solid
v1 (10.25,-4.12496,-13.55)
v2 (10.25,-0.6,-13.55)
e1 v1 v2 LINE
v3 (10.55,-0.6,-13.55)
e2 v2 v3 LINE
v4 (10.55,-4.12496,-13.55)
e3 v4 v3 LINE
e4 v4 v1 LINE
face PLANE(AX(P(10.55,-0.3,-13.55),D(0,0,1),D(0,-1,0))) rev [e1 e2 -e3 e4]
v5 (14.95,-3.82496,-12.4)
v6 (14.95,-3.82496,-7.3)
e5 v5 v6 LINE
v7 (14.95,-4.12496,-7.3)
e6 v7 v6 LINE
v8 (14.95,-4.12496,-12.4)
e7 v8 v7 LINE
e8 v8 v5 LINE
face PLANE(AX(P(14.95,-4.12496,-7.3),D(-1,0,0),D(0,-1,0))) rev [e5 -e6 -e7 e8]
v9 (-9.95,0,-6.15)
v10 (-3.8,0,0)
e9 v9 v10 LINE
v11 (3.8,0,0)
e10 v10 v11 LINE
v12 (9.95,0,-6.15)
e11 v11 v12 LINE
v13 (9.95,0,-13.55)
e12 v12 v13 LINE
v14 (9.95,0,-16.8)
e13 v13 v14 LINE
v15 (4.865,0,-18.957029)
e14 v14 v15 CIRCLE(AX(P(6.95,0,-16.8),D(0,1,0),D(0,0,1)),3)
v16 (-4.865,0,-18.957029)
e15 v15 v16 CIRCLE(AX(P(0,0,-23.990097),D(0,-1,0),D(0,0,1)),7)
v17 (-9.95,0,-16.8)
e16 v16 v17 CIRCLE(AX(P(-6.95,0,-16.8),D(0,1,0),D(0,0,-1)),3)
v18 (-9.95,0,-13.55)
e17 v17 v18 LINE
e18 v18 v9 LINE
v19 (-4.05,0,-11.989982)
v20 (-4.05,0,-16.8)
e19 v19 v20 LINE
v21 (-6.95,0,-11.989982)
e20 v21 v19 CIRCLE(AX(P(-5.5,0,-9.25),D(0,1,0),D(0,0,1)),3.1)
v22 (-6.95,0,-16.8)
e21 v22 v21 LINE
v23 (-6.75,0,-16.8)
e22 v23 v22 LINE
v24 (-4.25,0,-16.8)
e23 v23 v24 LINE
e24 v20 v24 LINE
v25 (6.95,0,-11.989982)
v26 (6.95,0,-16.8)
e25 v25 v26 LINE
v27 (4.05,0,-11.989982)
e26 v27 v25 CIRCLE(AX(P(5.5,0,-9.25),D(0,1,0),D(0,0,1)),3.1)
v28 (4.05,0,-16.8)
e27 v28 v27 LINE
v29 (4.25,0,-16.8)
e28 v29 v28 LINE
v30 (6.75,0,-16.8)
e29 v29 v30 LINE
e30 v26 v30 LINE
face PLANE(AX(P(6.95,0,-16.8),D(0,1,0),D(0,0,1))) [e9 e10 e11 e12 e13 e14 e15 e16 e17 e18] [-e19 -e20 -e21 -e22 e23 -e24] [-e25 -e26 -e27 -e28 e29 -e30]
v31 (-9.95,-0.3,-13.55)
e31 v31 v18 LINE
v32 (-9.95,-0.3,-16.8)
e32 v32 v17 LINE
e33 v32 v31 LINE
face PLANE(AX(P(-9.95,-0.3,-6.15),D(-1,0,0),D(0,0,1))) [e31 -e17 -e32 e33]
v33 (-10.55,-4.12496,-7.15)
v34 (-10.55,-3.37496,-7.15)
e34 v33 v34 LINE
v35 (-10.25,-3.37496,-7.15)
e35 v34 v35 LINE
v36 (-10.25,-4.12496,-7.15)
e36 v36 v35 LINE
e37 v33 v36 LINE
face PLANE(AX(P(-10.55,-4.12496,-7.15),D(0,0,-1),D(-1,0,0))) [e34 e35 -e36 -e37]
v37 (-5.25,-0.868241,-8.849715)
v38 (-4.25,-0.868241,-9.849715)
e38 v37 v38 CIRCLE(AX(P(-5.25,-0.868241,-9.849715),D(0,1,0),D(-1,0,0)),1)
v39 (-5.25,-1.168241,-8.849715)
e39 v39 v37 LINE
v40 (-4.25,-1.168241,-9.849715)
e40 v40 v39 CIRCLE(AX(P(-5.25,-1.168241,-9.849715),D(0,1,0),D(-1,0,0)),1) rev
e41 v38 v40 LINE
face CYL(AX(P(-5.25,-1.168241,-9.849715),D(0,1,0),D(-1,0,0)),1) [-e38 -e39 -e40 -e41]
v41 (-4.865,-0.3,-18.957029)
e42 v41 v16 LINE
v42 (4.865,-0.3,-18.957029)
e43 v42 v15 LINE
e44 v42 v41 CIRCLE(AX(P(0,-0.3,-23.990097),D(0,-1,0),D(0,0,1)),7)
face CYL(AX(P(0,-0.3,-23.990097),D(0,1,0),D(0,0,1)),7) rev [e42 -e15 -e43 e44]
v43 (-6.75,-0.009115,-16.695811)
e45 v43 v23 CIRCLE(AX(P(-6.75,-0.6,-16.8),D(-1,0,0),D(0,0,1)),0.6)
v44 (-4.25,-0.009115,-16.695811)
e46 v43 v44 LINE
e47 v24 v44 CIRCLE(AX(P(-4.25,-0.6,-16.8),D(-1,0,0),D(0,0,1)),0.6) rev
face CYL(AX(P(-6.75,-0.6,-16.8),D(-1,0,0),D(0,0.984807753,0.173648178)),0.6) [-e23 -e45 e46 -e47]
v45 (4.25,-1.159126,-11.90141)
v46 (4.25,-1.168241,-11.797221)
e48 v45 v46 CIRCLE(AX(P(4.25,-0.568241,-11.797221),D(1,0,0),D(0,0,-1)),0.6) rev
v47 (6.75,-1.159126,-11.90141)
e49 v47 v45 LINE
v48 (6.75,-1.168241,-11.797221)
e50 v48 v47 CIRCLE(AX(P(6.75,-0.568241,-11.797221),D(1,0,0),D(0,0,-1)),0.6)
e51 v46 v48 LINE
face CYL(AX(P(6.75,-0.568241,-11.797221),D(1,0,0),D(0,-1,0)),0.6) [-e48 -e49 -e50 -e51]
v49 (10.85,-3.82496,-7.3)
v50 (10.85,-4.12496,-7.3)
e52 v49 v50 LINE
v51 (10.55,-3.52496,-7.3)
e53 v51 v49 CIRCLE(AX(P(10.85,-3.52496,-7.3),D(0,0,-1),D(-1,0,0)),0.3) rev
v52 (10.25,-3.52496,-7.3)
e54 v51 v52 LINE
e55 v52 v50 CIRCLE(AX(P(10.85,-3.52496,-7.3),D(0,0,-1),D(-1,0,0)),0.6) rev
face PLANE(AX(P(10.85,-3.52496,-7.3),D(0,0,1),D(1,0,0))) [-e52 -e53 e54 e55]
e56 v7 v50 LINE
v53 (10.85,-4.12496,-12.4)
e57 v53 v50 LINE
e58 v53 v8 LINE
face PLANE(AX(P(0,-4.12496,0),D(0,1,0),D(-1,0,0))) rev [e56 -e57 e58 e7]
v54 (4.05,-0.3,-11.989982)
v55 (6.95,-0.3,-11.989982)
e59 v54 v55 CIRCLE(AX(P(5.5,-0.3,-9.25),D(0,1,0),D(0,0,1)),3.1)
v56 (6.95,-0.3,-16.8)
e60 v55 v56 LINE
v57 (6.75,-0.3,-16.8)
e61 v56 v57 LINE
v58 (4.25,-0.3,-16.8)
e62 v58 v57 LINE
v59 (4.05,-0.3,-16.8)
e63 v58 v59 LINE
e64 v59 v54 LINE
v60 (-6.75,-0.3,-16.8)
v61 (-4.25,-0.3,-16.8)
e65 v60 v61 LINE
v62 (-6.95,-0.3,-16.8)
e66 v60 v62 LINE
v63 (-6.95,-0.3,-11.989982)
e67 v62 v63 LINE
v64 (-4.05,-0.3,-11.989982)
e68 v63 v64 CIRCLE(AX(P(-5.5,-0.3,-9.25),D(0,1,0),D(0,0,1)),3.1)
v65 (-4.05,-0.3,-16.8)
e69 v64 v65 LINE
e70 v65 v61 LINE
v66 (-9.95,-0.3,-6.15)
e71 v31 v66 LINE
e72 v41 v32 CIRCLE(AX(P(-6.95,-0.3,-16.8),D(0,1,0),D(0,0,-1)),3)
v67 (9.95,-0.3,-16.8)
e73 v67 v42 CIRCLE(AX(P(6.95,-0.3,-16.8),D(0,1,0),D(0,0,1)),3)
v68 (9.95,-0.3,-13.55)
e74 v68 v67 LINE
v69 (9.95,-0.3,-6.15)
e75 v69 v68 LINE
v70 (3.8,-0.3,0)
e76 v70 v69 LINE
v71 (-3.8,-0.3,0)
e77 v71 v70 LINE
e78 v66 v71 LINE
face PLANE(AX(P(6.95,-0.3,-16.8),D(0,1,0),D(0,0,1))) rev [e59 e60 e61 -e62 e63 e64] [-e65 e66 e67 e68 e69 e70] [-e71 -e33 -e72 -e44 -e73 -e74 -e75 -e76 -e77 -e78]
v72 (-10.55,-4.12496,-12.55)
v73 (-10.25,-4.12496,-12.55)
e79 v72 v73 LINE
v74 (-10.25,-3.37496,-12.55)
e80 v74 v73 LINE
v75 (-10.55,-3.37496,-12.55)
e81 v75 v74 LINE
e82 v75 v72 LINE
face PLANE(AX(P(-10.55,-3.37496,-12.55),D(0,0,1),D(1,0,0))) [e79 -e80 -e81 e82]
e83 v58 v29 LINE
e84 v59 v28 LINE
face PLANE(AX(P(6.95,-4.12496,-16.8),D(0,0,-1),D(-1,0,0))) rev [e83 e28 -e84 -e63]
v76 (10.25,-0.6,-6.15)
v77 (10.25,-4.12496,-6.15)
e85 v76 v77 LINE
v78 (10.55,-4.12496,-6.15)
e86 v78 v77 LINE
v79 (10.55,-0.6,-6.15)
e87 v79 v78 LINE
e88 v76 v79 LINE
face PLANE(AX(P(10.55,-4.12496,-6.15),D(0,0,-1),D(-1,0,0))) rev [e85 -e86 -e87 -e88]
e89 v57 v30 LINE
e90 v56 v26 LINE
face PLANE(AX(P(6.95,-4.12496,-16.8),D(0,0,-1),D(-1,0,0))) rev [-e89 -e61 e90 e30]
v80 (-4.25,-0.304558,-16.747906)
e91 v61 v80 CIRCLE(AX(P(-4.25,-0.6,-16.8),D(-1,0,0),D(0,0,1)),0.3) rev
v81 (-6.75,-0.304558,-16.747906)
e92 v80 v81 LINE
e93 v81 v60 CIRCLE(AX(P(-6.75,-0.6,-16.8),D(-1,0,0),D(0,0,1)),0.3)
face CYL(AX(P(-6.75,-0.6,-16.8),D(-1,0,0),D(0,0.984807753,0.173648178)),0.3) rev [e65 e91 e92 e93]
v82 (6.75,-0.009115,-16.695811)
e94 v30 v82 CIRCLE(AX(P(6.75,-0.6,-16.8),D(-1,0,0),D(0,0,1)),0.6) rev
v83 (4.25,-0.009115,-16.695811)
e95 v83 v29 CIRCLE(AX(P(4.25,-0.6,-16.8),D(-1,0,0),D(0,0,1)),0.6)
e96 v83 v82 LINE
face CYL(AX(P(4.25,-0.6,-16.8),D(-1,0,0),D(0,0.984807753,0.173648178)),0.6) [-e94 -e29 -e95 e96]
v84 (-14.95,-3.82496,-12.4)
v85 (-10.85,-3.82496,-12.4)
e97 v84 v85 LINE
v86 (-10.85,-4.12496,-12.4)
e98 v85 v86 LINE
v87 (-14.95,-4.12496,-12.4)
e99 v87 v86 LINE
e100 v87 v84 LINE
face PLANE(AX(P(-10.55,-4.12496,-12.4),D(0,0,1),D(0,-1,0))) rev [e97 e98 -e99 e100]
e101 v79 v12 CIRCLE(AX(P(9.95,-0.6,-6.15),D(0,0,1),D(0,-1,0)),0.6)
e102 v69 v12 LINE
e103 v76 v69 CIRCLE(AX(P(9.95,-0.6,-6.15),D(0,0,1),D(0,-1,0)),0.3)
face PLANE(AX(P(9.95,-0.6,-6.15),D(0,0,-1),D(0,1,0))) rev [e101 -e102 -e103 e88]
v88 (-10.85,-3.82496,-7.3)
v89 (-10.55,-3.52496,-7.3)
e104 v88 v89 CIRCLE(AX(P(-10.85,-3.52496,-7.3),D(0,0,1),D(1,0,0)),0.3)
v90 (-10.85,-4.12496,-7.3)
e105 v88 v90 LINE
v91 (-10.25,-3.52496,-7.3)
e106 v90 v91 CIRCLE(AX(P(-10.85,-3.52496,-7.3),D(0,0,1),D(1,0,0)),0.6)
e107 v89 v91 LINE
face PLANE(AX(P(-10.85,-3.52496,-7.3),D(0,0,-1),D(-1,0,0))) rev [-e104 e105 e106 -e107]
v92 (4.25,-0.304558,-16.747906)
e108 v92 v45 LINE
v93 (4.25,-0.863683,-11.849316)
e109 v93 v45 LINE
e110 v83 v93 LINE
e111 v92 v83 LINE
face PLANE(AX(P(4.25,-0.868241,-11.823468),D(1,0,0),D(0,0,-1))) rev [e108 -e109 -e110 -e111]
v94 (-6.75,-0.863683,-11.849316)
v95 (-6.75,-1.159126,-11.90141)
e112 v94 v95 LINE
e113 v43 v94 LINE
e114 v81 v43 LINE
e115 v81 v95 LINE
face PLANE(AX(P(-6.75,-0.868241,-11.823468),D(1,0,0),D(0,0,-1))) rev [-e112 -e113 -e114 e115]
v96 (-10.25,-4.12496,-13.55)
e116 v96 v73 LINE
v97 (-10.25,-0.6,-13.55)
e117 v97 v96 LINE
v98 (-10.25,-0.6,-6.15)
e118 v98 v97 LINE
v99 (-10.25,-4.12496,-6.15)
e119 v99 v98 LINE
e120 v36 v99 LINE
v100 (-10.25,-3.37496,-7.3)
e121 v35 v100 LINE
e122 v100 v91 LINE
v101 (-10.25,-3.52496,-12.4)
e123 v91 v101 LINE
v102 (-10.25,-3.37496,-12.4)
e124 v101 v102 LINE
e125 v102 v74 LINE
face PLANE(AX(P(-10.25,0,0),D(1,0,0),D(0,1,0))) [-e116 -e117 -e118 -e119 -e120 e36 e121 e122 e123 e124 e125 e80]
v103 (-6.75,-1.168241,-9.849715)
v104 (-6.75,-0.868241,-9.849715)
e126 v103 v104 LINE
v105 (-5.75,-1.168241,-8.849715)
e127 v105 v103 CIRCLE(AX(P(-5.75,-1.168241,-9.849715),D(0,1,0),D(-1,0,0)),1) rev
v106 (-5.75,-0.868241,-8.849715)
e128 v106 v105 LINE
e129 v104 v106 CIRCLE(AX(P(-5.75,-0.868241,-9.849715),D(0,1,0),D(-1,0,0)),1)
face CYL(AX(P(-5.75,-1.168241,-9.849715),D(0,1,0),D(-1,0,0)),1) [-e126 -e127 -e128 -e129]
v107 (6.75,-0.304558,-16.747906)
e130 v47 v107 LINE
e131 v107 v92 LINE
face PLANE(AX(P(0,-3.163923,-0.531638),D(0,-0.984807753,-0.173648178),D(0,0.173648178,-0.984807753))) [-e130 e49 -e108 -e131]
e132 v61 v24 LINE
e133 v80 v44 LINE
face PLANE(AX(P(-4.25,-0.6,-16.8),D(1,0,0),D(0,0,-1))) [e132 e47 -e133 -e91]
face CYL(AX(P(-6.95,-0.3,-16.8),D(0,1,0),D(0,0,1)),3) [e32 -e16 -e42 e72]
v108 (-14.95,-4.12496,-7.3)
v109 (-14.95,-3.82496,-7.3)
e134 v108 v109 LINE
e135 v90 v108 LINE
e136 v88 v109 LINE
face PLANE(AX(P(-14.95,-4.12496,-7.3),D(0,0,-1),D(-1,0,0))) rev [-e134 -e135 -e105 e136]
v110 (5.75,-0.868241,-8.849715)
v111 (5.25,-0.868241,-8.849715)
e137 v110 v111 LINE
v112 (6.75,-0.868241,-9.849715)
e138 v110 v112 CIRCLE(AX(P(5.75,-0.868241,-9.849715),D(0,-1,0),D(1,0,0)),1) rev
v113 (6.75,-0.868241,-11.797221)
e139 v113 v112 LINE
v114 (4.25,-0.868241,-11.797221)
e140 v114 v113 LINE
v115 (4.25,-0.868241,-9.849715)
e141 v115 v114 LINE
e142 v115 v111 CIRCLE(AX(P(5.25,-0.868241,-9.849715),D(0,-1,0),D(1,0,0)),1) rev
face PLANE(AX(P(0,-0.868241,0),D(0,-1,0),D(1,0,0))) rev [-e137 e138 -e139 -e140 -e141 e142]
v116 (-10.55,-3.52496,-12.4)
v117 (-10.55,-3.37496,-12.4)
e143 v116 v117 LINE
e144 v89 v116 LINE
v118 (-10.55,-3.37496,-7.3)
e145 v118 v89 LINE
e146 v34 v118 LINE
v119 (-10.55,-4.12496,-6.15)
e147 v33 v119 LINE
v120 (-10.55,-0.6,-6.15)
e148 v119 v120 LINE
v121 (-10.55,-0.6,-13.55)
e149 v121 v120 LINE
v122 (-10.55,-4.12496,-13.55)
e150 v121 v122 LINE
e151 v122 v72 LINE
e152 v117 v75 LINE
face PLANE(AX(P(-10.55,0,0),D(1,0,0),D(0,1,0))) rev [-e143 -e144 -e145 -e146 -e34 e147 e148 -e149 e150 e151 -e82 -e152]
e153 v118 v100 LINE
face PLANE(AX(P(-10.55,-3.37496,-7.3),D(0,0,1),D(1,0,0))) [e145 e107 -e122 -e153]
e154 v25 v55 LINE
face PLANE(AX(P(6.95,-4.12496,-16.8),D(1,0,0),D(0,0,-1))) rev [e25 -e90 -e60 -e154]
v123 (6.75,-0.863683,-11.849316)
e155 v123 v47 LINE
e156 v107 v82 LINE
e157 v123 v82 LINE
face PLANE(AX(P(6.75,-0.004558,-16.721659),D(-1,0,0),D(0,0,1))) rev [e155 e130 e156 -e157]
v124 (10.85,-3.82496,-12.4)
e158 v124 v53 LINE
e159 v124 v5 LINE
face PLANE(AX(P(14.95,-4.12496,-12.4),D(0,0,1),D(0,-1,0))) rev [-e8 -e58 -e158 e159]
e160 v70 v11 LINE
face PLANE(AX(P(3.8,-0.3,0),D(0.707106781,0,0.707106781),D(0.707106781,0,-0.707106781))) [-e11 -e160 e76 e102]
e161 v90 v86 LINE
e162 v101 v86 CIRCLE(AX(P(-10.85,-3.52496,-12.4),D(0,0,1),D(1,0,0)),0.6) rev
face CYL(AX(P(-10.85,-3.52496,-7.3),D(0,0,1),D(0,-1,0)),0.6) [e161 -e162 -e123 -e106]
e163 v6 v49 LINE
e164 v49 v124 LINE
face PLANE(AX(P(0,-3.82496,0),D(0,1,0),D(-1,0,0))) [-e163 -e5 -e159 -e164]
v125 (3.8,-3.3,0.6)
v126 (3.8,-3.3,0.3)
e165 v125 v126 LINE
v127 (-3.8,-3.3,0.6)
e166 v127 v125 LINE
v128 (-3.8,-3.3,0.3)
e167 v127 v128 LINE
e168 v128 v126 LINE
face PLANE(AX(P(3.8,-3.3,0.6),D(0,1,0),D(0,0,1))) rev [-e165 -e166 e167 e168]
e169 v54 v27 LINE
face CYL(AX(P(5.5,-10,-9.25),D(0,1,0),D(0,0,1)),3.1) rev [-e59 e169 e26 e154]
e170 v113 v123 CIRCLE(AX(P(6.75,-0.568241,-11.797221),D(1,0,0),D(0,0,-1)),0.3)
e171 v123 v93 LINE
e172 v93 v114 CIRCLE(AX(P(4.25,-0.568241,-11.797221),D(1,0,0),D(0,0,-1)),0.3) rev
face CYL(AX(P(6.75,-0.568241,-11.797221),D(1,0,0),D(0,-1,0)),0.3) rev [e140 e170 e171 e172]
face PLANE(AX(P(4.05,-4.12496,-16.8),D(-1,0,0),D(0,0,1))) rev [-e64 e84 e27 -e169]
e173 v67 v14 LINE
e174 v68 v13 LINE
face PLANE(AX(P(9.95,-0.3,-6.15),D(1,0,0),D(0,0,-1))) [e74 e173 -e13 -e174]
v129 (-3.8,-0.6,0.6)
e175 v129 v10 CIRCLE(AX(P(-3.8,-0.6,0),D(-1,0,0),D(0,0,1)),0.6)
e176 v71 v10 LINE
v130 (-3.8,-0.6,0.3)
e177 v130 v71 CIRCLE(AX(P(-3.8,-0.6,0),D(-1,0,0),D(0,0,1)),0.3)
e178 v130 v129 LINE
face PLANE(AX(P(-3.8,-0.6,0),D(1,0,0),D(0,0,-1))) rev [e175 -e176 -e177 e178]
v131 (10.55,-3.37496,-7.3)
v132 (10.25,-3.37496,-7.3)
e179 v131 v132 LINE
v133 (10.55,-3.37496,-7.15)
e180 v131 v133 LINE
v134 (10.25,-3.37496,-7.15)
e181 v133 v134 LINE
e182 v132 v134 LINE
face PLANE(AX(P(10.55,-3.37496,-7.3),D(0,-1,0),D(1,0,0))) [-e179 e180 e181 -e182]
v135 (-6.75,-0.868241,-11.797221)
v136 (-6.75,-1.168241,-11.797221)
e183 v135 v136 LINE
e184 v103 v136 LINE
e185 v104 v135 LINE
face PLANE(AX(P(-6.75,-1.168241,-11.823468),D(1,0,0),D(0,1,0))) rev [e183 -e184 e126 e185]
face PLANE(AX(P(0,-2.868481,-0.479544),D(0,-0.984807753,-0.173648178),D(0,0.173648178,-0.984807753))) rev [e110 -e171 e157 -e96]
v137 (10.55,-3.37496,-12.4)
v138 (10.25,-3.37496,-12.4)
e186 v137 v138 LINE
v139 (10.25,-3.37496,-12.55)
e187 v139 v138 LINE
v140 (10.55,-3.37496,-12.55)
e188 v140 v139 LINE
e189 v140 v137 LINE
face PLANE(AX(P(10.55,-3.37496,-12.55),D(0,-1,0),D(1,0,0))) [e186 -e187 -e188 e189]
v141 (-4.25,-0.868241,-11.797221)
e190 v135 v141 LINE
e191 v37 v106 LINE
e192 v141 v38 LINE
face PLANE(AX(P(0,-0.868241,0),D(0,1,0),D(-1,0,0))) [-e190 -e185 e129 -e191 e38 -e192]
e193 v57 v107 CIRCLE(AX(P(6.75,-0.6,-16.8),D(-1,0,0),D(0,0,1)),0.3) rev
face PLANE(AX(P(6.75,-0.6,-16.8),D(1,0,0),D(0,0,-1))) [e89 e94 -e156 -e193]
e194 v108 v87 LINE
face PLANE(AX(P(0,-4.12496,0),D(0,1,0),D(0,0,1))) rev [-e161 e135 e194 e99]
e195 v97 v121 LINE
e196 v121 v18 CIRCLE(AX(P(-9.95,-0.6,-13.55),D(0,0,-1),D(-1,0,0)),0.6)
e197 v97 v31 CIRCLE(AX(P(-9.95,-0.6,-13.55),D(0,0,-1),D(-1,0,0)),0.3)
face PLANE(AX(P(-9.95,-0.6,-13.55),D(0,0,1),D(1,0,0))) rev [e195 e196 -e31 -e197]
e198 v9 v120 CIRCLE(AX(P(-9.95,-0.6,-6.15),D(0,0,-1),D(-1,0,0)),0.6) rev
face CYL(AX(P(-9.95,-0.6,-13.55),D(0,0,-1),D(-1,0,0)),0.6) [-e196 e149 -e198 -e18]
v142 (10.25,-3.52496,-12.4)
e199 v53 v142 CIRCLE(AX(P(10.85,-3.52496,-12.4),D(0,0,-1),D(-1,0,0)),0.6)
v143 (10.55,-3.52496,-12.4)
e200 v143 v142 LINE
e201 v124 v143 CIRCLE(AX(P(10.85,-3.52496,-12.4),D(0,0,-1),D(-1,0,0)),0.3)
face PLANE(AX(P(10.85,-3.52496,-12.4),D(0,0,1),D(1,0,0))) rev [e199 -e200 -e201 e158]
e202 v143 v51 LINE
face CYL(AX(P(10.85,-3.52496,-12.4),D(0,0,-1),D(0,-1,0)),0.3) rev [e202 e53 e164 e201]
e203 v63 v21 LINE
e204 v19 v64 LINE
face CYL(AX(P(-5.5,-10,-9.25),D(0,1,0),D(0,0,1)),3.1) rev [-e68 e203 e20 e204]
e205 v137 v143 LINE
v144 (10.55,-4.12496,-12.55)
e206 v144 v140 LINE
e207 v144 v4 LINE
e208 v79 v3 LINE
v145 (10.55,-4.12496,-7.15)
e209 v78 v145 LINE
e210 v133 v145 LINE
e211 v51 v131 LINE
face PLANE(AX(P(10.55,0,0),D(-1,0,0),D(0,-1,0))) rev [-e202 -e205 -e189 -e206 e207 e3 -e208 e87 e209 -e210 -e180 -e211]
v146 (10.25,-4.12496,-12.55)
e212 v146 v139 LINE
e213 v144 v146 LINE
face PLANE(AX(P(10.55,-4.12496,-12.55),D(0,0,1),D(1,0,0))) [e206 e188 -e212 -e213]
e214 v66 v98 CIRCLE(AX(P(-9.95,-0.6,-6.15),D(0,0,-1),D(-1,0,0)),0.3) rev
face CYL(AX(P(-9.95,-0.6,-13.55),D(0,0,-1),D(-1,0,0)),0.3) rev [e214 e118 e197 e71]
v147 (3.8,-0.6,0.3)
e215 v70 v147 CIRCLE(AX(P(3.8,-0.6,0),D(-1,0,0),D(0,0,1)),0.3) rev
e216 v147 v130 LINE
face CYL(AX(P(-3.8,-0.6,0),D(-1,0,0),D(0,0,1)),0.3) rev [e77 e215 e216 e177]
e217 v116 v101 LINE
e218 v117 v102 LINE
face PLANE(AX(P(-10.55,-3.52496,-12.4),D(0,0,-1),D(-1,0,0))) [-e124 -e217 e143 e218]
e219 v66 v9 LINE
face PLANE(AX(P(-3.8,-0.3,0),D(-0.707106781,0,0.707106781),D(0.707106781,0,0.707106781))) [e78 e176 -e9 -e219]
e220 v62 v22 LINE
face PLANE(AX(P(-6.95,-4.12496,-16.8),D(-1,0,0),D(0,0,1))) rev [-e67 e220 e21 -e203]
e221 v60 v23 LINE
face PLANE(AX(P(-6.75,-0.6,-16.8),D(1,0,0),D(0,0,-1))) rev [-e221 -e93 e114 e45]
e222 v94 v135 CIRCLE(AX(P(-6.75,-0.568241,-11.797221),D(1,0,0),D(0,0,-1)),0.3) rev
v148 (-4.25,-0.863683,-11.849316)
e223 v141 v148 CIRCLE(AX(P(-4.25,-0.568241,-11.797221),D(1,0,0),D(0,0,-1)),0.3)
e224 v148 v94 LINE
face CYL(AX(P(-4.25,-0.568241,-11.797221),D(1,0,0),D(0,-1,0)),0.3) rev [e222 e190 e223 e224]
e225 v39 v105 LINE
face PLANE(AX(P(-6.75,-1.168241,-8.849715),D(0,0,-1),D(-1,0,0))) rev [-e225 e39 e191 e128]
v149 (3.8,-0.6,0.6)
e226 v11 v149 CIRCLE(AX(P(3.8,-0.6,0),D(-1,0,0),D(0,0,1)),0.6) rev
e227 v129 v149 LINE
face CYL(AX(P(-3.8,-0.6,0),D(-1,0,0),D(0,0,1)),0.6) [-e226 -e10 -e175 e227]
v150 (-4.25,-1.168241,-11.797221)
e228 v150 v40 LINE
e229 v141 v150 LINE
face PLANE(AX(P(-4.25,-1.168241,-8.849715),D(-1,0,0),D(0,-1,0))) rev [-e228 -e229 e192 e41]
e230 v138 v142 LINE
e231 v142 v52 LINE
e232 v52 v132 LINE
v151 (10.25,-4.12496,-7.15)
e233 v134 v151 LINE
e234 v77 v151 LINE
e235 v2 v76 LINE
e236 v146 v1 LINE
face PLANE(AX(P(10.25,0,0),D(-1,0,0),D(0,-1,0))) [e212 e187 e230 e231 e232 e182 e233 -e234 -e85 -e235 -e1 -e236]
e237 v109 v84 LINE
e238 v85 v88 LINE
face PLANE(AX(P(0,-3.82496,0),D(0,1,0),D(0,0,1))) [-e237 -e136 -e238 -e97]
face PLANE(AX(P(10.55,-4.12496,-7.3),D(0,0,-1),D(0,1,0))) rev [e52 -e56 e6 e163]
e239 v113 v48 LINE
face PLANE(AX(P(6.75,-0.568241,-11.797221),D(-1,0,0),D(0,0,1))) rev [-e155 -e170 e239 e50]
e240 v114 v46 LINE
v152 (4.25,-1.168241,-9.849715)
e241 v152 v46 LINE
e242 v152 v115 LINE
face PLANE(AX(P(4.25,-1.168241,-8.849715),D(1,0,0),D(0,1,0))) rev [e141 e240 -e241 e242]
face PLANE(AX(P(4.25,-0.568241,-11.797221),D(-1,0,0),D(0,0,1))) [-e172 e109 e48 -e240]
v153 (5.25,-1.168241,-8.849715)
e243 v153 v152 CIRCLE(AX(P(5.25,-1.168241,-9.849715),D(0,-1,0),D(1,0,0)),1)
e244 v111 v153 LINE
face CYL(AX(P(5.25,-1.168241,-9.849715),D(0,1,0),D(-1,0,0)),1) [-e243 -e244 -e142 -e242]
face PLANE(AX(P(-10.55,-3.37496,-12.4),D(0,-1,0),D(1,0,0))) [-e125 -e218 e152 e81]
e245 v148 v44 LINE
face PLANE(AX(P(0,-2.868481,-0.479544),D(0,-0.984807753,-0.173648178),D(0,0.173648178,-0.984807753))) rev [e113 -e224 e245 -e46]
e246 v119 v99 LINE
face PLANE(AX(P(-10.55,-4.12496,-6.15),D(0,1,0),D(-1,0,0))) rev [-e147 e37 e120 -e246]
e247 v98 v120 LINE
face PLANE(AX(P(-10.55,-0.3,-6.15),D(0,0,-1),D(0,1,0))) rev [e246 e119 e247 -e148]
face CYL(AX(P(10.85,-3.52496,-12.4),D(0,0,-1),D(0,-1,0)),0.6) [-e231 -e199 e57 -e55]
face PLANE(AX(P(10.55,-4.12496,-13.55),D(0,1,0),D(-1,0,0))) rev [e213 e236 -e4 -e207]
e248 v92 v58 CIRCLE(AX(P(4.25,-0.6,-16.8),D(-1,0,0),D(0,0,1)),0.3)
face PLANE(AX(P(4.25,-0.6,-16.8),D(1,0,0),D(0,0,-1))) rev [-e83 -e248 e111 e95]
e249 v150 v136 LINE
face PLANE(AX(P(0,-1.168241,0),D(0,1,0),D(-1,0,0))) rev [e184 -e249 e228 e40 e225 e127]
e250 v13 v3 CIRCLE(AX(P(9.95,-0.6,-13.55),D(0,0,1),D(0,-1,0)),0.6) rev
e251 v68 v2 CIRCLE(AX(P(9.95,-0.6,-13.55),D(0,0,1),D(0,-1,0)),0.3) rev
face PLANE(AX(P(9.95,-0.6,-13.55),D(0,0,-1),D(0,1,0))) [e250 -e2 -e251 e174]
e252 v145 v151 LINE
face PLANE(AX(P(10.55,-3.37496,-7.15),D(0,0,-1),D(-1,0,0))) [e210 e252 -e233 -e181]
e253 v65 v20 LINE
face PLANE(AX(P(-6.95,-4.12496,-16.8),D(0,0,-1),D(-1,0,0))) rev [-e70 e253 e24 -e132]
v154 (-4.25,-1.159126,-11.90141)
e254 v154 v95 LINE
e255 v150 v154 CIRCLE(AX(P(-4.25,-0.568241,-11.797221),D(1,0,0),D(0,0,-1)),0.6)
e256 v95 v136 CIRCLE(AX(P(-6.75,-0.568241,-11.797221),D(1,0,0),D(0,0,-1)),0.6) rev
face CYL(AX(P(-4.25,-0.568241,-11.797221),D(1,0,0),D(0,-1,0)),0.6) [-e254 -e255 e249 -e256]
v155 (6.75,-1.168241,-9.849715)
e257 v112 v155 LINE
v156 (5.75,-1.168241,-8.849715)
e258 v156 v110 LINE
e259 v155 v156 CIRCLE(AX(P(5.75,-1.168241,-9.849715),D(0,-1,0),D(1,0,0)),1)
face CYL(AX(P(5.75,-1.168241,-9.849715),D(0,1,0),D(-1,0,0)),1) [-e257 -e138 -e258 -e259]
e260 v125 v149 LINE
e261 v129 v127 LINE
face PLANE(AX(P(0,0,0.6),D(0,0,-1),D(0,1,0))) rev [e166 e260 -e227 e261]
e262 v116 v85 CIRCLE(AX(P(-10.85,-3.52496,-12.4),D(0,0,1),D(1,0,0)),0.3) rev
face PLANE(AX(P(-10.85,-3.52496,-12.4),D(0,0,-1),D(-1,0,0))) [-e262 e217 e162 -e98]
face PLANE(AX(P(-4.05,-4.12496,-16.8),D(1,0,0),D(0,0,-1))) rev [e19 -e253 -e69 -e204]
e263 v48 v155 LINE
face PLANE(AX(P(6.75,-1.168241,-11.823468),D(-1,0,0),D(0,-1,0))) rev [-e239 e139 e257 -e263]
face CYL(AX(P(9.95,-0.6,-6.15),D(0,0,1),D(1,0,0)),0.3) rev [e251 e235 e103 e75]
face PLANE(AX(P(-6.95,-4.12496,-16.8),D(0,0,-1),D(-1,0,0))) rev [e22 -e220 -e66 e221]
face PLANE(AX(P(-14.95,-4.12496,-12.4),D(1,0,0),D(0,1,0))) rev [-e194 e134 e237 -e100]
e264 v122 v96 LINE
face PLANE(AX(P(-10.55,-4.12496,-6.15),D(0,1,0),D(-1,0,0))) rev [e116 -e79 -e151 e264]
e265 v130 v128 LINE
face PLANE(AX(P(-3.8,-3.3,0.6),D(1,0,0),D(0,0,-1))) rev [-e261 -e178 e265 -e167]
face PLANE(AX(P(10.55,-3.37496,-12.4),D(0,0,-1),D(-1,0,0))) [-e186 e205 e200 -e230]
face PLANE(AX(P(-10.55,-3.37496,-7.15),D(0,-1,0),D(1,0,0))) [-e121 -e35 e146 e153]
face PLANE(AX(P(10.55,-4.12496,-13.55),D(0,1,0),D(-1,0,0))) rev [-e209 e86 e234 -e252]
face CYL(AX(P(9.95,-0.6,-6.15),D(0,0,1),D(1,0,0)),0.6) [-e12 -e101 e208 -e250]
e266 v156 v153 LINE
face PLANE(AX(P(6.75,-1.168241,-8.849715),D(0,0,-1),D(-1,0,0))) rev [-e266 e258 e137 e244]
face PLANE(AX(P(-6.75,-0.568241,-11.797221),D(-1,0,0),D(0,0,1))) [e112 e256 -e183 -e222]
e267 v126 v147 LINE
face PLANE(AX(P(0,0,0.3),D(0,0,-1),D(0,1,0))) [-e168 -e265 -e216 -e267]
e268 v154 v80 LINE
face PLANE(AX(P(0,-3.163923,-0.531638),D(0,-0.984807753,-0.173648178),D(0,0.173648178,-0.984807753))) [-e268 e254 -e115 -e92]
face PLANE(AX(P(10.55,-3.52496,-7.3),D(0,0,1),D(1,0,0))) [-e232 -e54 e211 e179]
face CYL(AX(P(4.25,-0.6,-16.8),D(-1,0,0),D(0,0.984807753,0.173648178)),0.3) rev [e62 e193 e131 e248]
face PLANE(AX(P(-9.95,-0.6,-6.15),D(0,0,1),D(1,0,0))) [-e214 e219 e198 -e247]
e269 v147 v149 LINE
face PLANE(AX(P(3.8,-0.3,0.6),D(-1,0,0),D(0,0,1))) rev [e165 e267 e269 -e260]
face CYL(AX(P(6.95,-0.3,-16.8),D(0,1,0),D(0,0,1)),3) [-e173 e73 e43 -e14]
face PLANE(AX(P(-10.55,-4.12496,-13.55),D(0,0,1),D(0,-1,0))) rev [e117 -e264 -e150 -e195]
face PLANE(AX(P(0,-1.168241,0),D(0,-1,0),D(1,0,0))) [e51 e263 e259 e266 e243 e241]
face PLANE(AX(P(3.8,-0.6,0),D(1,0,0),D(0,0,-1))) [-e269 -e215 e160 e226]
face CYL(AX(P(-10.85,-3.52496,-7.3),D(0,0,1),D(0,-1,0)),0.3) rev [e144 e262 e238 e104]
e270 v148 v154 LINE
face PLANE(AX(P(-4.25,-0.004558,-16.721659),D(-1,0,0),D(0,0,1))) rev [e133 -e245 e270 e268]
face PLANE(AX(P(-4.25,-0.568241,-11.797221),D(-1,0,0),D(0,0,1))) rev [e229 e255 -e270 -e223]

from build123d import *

# Parameters (mm, degrees)
BASE_FLANGE1_DEPTH              = 0.3
EDGE_FLANGE2_DEPTH              = 7.6
EDGE_FLANGE3_DEPTH              = 7.4
EDGE_FLANGE3_BEND_DEPTH         = 7.4
EDGE_FLANGE9_STRIP_W            = 1.8
EDGE_FLANGE9_STRIP_H            = 0.3
EDGE_FLANGE9_STRIP_CUT_DEPTH    = 5.1
EDGE_FLANGE9_RELIEF_W           = 1.95
EDGE_FLANGE9_RELIEF_H           = 0.15
EDGE_FLANGE9_RELIEF_CUT_DEPTH   = 0.3
EDGE_FLANGE9_STRIP_2_W          = 1.8
EDGE_FLANGE9_STRIP_2_H          = 0.3
EDGE_FLANGE9_STRIP_CUT_2_DEPTH  = 5.1
EDGE_FLANGE9_RELIEF_2_W         = 1.95
EDGE_FLANGE9_RELIEF_2_H         = 0.15
EDGE_FLANGE9_RELIEF_CUT_2_DEPTH = 0.3
EDGE_FLANGE9_DEPTH              = 5.1
EDGE_FLANGE9_BEND_DEPTH         = 5.1
SKETCH164_R                     = 3.1
CUT_EXTRUDE1_DEPTH              = 10
CUT_EXTRUDE2_DEPTH              = 26.150701614
CUT_EXTRUDE2_DEPTH_BACK         = 26.150701614
SKETCH228_W                     = 2.9
SKETCH228_H                     = 7.24828594
EDGE_FLANGE10_DEPTH             = 2.5
EDGE_FLANGE10_BEND_DEPTH        = 2.5
EDGE_FLANGE11_STRIP_CUT_DEPTH   = 2.5
EDGE_FLANGE11_STRIP_CUT_2_DEPTH = 2.5
EDGE_FLANGE11_DEPTH             = 2.5
EDGE_FLANGE11_BEND_DEPTH        = 2.5
BREAK_CORNER1_START             = -1.168240888
BREAK_CORNER1_DEPTH             = 0.3


# Read off the part's stored shape, not the designer's step: Break-Corner1
# Sheet-metal steps are written as plain solids
with BuildPart() as part:
    # Sketch1 → Base-Flange1 (new body)
    with BuildSketch(Plane(origin=(0, 0, 0), x_dir=(1, 0, 0), z_dir=(0, 1, 0))):
        with BuildLine():
            Line((-3.8, 0), (3.8, 0))
            Line((3.8, 0), (9.95, 6.15))
            Line((9.95, 6.15), (9.95, 16.8))
            ThreePointArc((9.95, 16.8), (8.121537451, 19.561792896), (4.865, 18.957029207))
            ThreePointArc((4.865, 18.957029207), (0, 16.990097357), (-4.865, 18.957029207))
            ThreePointArc((-4.865, 18.957029207), (-8.121537451, 19.561792896), (-9.95, 16.8))
            Line((-9.95, 16.8), (-9.95, 6.15))
            Line((-9.95, 6.15), (-3.8, 0))
        make_face()
    extrude(amount=-BASE_FLANGE1_DEPTH)

    # Edge-Flange2 section (across the edge) → Edge-Flange2 (add)
    with BuildSketch(Plane(origin=(3.8, -0.3, 0.3), x_dir=(0, 0, -1), z_dir=(-1, 0, 0))):
        with BuildLine():
            Line((-0.3, 0.3), (-0.3, 3))
            Line((-0.3, 3), (0, 3))
            Line((0, 3), (0, 0.3))
            ThreePointArc((0, 0.3), (0.087867966, 0.087867966), (0.3, 0))
            Line((0.3, 0), (0.3, -0.3))
            ThreePointArc((0.3, -0.3), (-0.124264069, -0.124264069), (-0.3, 0.3))
        make_face()
    extrude(amount=EDGE_FLANGE2_DEPTH)

    # Edge-Flange3 section (across the edge) → Edge-Flange3 (add)
    with BuildSketch(Plane(origin=(10.25, -0.3, -13.55), x_dir=(-1, 0, 0), z_dir=(0, 0, 1))):
        with BuildLine():
            Line((-0.3, 0.3), (-0.3, 3.8249596))
            Line((-0.3, 3.8249596), (0, 3.8249596))
            Line((0, 3.8249596), (0, 0.3))
            ThreePointArc((0, 0.3), (0.087867966, 0.087867966), (0.3, 0))
            Line((0.3, 0), (0.3, -0.3))
            ThreePointArc((0.3, -0.3), (-0.124264069, -0.124264069), (-0.3, 0.3))
        make_face()
    extrude(amount=EDGE_FLANGE3_DEPTH)

    # Edge-Flange3 section 2 (across the edge) → Edge-Flange3 bend (add)
    with BuildSketch(Plane(origin=(-10.25, -0.3, -6.15), x_dir=(1, 0, 0), z_dir=(0, 0, -1))):
        with BuildLine():
            Line((-0.3, 0.3), (-0.3, 3.8249596))
            Line((-0.3, 3.8249596), (0, 3.8249596))
            Line((0, 3.8249596), (0, 0.3))
            ThreePointArc((0, 0.3), (0.087867966, 0.087867966), (0.3, 0))
            Line((0.3, 0), (0.3, -0.3))
            ThreePointArc((0.3, -0.3), (-0.124264069, -0.124264069), (-0.3, 0.3))
        make_face()
    extrude(amount=EDGE_FLANGE3_BEND_DEPTH)

    # Edge-Flange9 strip (across the edge) → Edge-Flange9 strip cut (cut)
    with BuildSketch(Plane(origin=(-10.55, -4.1249596, -12.4), x_dir=(0, 1, 0), z_dir=(0, 0, 1))):
        with Locations((-0.3, -0.15)):
            Rectangle(EDGE_FLANGE9_STRIP_W, EDGE_FLANGE9_STRIP_H)
    extrude(amount=EDGE_FLANGE9_STRIP_CUT_DEPTH, mode=Mode.SUBTRACT)

    # Edge-Flange9 relief (on the sheet) → Edge-Flange9 relief cut (cut)
    with BuildSketch(Plane(origin=(-10.55, -3.5249596, -12.4), x_dir=(0, 1, 0), z_dir=(-1, 0, 0))):
        with Locations((-0.825, 0.075)):
            Rectangle(EDGE_FLANGE9_RELIEF_W, EDGE_FLANGE9_RELIEF_H)
        with Locations((-0.825, -5.175)):
            Rectangle(EDGE_FLANGE9_RELIEF_W, EDGE_FLANGE9_RELIEF_H)
    extrude(amount=-EDGE_FLANGE9_RELIEF_CUT_DEPTH, mode=Mode.SUBTRACT)

    # Edge-Flange9 strip 2 (across the edge) → Edge-Flange9 strip cut 2 (cut)
    with BuildSketch(Plane(origin=(10.55, -4.1249596, -7.3), x_dir=(0, 1, 0), z_dir=(0, 0, -1))):
        with Locations((-0.3, -0.15)):
            Rectangle(EDGE_FLANGE9_STRIP_2_W, EDGE_FLANGE9_STRIP_2_H)
    extrude(amount=EDGE_FLANGE9_STRIP_CUT_2_DEPTH, mode=Mode.SUBTRACT)

    # Edge-Flange9 relief 2 (on the sheet) → Edge-Flange9 relief cut 2 (cut)
    with BuildSketch(Plane(origin=(10.55, -3.5249596, -7.3), x_dir=(0, 1, 0), z_dir=(1, 0, 0))):
        with Locations((-0.825, 0.075)):
            Rectangle(EDGE_FLANGE9_RELIEF_2_W, EDGE_FLANGE9_RELIEF_2_H)
        with Locations((-0.825, -5.175)):
            Rectangle(EDGE_FLANGE9_RELIEF_2_W, EDGE_FLANGE9_RELIEF_2_H)
    extrude(amount=-EDGE_FLANGE9_RELIEF_CUT_2_DEPTH, mode=Mode.SUBTRACT)

    # Edge-Flange9 section (across the edge) → Edge-Flange9 (add)
    with BuildSketch(Plane(origin=(-10.55, -4.1249596, -12.4), x_dir=(0, 1, 0), z_dir=(0, 0, 1))):
        with BuildLine():
            Line((0, 0.3), (0, 4.4))
            Line((0, 4.4), (0.3, 4.4))
            Line((0.3, 4.4), (0.3, 0.3))
            ThreePointArc((0.3, 0.3), (0.387867966, 0.087867966), (0.6, 0))
            Line((0.6, 0), (0.6, -0.3))
            ThreePointArc((0.6, -0.3), (0.175735931, -0.124264069), (0, 0.3))
        make_face()
    extrude(amount=EDGE_FLANGE9_DEPTH)

    # Edge-Flange9 section 2 (across the edge) → Edge-Flange9 bend (add)
    with BuildSketch(Plane(origin=(10.55, -4.1249596, -7.3), x_dir=(0, 1, 0), z_dir=(0, 0, -1))):
        with BuildLine():
            Line((0, 0.3), (0, 4.4))
            Line((0, 4.4), (0.3, 4.4))
            Line((0.3, 4.4), (0.3, 0.3))
            ThreePointArc((0.3, 0.3), (0.387867966, 0.087867966), (0.6, 0))
            Line((0.6, 0), (0.6, -0.3))
            ThreePointArc((0.6, -0.3), (0.175735931, -0.124264069), (0, 0.3))
        make_face()
    extrude(amount=EDGE_FLANGE9_BEND_DEPTH)

    # Sketch164 → Cut-Extrude1 (cut)
    with BuildSketch(Plane(origin=(0, 0, 0), x_dir=(1, 0, 0), z_dir=(0, 1, 0))):
        with Locations(Location((-5.5, 9.25, 0), (0, 0, 270))):
            Circle(SKETCH164_R)
        with Locations(Location((5.5, 9.25, 0), (0, 0, 270))):
            Circle(SKETCH164_R)
    extrude(amount=-CUT_EXTRUDE1_DEPTH, mode=Mode.SUBTRACT)

    # Sketch228 → Cut-Extrude2 (cut, two sides: drawn at the far end of the back side and taken through both)
    with BuildSketch(Plane(origin=(0, 0, 0), x_dir=(1, 0, 0), z_dir=(0, 1, 0)).offset(-CUT_EXTRUDE2_DEPTH_BACK)):
        with Locations((-5.5, 13.17585703)):
            Rectangle(SKETCH228_W, SKETCH228_H)
        with Locations((5.5, 13.17585703)):
            Rectangle(SKETCH228_W, SKETCH228_H)
    extrude(amount=CUT_EXTRUDE2_DEPTH + CUT_EXTRUDE2_DEPTH_BACK, mode=Mode.SUBTRACT)

    # Edge-Flange10 section (across the edge) → Edge-Flange10 (add)
    with BuildSketch(Plane(origin=(-4.25, -0.3, -16.773753401), x_dir=(0, -0.9848077530122092, -0.1736481776669237), z_dir=(-1, 0, 0))):
        with BuildLine():
            Line((-0.3, 0.026246599), (-0.3, 4.973753401))
            Line((-0.3, 4.973753401), (0, 4.973753401))
            Line((0, 4.973753401), (0, 0.026246599))
            ThreePointArc((0, 0.026246599), (0.001141591, 9.9876e-05), (0.004557674, -0.025847854))
            Line((0.004557674, -0.025847854), (-0.290884652, -0.077942308))
            ThreePointArc((-0.290884652, -0.077942308), (-0.297716819, -0.026046847), (-0.3, 0.026246599))
        make_face()
    extrude(amount=EDGE_FLANGE10_DEPTH)

    # Edge-Flange10 section 2 (across the edge) → Edge-Flange10 bend (add)
    with BuildSketch(Plane(origin=(6.75, -0.3, -16.773753401), x_dir=(0, -0.9848077530122092, -0.1736481776669237), z_dir=(-1, 0, 0))):
        with BuildLine():
            Line((-0.3, 0.026246599), (-0.3, 4.973753401))
            Line((-0.3, 4.973753401), (0, 4.973753401))
            Line((0, 4.973753401), (0, 0.026246599))
            ThreePointArc((0, 0.026246599), (0.001141591, 9.9876e-05), (0.004557674, -0.025847854))
            Line((0.004557674, -0.025847854), (-0.290884652, -0.077942308))
            ThreePointArc((-0.290884652, -0.077942308), (-0.297716819, -0.026046847), (-0.3, 0.026246599))
        make_face()
    extrude(amount=EDGE_FLANGE10_BEND_DEPTH)

    # Edge-Flange11 strip (across the edge) → Edge-Flange11 strip cut (cut)
    with BuildSketch(Plane(origin=(-6.75, -0.868240888, -11.823468037), x_dir=(0, 1, 0), z_dir=(1, 0, 0))):
        Polygon((-0.603451372, 1.694711648), (-0.290884652, -0.077942308), (0.004557674, -0.025847854), (-0.308009046, 1.746806101), align=None)
    extrude(amount=EDGE_FLANGE11_STRIP_CUT_DEPTH, mode=Mode.SUBTRACT)

    # Edge-Flange11 strip 2 (across the edge) → Edge-Flange11 strip cut 2 (cut)
    with BuildSketch(Plane(origin=(4.25, -0.868240888, -11.823468037), x_dir=(0, 1, 0), z_dir=(1, 0, 0))):
        Polygon((-0.603451372, 1.694711648), (-0.290884652, -0.077942308), (0.004557674, -0.025847854), (-0.308009046, 1.746806101), align=None)
    extrude(amount=EDGE_FLANGE11_STRIP_CUT_2_DEPTH, mode=Mode.SUBTRACT)

    # Edge-Flange11 section (across the edge) → Edge-Flange11 (add)
    with BuildSketch(Plane(origin=(-6.75, -0.868240888, -11.823468037), x_dir=(0, 1, 0), z_dir=(1, 0, 0))):
        with BuildLine():
            Line((-0.3, 0.026246599), (-0.3, 2.973753401))
            Line((-0.3, 2.973753401), (0, 2.973753401))
            Line((0, 2.973753401), (0, 0.026246599))
            ThreePointArc((0, 0.026246599), (0.001141591, 9.9876e-05), (0.004557674, -0.025847854))
            Line((0.004557674, -0.025847854), (-0.290884652, -0.077942308))
            ThreePointArc((-0.290884652, -0.077942308), (-0.297716819, -0.026046847), (-0.3, 0.026246599))
        make_face()
    extrude(amount=EDGE_FLANGE11_DEPTH)

    # Edge-Flange11 section 2 (across the edge) → Edge-Flange11 bend (add)
    with BuildSketch(Plane(origin=(4.25, -0.868240888, -11.823468037), x_dir=(0, 1, 0), z_dir=(1, 0, 0))):
        with BuildLine():
            Line((-0.3, 0.026246599), (-0.3, 2.973753401))
            Line((-0.3, 2.973753401), (0, 2.973753401))
            Line((0, 2.973753401), (0, 0.026246599))
            ThreePointArc((0, 0.026246599), (0.001141591, 9.9876e-05), (0.004557674, -0.025847854))
            Line((0.004557674, -0.025847854), (-0.290884652, -0.077942308))
            ThreePointArc((-0.290884652, -0.077942308), (-0.297716819, -0.026046847), (-0.3, 0.026246599))
        make_face()
    extrude(amount=EDGE_FLANGE11_BEND_DEPTH)

    # Break-Corner1 outline → Break-Corner1 (cut)
    with BuildSketch(Plane(origin=(0, 0, 0), x_dir=(1, 0, 0), z_dir=(0, 1, 0)).offset(BREAK_CORNER1_START)):
        with BuildLine():
            ThreePointArc((6.75, 9.849714636), (6.457106781, 9.142607855), (5.75, 8.849714636))
            Line((5.75, 8.849714636), (6.75, 8.849714636))
            Line((6.75, 8.849714636), (6.75, 9.849714636))
        make_face()
        with BuildLine():
            Line((4.25, 8.849714636), (5.25, 8.849714636))
            ThreePointArc((5.25, 8.849714636), (4.542893219, 9.142607855), (4.25, 9.849714636))
            Line((4.25, 9.849714636), (4.25, 8.849714636))
        make_face()
        with BuildLine():
            ThreePointArc((-4.25, 9.849714636), (-4.542893219, 9.142607855), (-5.25, 8.849714636))
            Line((-5.25, 8.849714636), (-4.25, 8.849714636))
            Line((-4.25, 8.849714636), (-4.25, 9.849714636))
        make_face()
        with BuildLine():
            ThreePointArc((-5.75, 8.849714636), (-6.457106781, 9.142607855), (-6.75, 9.849714636))
            Line((-6.75, 9.849714636), (-6.75, 8.849714636))
            Line((-6.75, 8.849714636), (-5.75, 8.849714636))
        make_face()
    extrude(amount=BREAK_CORNER1_DEPTH, mode=Mode.SUBTRACT)


solid = part.part
